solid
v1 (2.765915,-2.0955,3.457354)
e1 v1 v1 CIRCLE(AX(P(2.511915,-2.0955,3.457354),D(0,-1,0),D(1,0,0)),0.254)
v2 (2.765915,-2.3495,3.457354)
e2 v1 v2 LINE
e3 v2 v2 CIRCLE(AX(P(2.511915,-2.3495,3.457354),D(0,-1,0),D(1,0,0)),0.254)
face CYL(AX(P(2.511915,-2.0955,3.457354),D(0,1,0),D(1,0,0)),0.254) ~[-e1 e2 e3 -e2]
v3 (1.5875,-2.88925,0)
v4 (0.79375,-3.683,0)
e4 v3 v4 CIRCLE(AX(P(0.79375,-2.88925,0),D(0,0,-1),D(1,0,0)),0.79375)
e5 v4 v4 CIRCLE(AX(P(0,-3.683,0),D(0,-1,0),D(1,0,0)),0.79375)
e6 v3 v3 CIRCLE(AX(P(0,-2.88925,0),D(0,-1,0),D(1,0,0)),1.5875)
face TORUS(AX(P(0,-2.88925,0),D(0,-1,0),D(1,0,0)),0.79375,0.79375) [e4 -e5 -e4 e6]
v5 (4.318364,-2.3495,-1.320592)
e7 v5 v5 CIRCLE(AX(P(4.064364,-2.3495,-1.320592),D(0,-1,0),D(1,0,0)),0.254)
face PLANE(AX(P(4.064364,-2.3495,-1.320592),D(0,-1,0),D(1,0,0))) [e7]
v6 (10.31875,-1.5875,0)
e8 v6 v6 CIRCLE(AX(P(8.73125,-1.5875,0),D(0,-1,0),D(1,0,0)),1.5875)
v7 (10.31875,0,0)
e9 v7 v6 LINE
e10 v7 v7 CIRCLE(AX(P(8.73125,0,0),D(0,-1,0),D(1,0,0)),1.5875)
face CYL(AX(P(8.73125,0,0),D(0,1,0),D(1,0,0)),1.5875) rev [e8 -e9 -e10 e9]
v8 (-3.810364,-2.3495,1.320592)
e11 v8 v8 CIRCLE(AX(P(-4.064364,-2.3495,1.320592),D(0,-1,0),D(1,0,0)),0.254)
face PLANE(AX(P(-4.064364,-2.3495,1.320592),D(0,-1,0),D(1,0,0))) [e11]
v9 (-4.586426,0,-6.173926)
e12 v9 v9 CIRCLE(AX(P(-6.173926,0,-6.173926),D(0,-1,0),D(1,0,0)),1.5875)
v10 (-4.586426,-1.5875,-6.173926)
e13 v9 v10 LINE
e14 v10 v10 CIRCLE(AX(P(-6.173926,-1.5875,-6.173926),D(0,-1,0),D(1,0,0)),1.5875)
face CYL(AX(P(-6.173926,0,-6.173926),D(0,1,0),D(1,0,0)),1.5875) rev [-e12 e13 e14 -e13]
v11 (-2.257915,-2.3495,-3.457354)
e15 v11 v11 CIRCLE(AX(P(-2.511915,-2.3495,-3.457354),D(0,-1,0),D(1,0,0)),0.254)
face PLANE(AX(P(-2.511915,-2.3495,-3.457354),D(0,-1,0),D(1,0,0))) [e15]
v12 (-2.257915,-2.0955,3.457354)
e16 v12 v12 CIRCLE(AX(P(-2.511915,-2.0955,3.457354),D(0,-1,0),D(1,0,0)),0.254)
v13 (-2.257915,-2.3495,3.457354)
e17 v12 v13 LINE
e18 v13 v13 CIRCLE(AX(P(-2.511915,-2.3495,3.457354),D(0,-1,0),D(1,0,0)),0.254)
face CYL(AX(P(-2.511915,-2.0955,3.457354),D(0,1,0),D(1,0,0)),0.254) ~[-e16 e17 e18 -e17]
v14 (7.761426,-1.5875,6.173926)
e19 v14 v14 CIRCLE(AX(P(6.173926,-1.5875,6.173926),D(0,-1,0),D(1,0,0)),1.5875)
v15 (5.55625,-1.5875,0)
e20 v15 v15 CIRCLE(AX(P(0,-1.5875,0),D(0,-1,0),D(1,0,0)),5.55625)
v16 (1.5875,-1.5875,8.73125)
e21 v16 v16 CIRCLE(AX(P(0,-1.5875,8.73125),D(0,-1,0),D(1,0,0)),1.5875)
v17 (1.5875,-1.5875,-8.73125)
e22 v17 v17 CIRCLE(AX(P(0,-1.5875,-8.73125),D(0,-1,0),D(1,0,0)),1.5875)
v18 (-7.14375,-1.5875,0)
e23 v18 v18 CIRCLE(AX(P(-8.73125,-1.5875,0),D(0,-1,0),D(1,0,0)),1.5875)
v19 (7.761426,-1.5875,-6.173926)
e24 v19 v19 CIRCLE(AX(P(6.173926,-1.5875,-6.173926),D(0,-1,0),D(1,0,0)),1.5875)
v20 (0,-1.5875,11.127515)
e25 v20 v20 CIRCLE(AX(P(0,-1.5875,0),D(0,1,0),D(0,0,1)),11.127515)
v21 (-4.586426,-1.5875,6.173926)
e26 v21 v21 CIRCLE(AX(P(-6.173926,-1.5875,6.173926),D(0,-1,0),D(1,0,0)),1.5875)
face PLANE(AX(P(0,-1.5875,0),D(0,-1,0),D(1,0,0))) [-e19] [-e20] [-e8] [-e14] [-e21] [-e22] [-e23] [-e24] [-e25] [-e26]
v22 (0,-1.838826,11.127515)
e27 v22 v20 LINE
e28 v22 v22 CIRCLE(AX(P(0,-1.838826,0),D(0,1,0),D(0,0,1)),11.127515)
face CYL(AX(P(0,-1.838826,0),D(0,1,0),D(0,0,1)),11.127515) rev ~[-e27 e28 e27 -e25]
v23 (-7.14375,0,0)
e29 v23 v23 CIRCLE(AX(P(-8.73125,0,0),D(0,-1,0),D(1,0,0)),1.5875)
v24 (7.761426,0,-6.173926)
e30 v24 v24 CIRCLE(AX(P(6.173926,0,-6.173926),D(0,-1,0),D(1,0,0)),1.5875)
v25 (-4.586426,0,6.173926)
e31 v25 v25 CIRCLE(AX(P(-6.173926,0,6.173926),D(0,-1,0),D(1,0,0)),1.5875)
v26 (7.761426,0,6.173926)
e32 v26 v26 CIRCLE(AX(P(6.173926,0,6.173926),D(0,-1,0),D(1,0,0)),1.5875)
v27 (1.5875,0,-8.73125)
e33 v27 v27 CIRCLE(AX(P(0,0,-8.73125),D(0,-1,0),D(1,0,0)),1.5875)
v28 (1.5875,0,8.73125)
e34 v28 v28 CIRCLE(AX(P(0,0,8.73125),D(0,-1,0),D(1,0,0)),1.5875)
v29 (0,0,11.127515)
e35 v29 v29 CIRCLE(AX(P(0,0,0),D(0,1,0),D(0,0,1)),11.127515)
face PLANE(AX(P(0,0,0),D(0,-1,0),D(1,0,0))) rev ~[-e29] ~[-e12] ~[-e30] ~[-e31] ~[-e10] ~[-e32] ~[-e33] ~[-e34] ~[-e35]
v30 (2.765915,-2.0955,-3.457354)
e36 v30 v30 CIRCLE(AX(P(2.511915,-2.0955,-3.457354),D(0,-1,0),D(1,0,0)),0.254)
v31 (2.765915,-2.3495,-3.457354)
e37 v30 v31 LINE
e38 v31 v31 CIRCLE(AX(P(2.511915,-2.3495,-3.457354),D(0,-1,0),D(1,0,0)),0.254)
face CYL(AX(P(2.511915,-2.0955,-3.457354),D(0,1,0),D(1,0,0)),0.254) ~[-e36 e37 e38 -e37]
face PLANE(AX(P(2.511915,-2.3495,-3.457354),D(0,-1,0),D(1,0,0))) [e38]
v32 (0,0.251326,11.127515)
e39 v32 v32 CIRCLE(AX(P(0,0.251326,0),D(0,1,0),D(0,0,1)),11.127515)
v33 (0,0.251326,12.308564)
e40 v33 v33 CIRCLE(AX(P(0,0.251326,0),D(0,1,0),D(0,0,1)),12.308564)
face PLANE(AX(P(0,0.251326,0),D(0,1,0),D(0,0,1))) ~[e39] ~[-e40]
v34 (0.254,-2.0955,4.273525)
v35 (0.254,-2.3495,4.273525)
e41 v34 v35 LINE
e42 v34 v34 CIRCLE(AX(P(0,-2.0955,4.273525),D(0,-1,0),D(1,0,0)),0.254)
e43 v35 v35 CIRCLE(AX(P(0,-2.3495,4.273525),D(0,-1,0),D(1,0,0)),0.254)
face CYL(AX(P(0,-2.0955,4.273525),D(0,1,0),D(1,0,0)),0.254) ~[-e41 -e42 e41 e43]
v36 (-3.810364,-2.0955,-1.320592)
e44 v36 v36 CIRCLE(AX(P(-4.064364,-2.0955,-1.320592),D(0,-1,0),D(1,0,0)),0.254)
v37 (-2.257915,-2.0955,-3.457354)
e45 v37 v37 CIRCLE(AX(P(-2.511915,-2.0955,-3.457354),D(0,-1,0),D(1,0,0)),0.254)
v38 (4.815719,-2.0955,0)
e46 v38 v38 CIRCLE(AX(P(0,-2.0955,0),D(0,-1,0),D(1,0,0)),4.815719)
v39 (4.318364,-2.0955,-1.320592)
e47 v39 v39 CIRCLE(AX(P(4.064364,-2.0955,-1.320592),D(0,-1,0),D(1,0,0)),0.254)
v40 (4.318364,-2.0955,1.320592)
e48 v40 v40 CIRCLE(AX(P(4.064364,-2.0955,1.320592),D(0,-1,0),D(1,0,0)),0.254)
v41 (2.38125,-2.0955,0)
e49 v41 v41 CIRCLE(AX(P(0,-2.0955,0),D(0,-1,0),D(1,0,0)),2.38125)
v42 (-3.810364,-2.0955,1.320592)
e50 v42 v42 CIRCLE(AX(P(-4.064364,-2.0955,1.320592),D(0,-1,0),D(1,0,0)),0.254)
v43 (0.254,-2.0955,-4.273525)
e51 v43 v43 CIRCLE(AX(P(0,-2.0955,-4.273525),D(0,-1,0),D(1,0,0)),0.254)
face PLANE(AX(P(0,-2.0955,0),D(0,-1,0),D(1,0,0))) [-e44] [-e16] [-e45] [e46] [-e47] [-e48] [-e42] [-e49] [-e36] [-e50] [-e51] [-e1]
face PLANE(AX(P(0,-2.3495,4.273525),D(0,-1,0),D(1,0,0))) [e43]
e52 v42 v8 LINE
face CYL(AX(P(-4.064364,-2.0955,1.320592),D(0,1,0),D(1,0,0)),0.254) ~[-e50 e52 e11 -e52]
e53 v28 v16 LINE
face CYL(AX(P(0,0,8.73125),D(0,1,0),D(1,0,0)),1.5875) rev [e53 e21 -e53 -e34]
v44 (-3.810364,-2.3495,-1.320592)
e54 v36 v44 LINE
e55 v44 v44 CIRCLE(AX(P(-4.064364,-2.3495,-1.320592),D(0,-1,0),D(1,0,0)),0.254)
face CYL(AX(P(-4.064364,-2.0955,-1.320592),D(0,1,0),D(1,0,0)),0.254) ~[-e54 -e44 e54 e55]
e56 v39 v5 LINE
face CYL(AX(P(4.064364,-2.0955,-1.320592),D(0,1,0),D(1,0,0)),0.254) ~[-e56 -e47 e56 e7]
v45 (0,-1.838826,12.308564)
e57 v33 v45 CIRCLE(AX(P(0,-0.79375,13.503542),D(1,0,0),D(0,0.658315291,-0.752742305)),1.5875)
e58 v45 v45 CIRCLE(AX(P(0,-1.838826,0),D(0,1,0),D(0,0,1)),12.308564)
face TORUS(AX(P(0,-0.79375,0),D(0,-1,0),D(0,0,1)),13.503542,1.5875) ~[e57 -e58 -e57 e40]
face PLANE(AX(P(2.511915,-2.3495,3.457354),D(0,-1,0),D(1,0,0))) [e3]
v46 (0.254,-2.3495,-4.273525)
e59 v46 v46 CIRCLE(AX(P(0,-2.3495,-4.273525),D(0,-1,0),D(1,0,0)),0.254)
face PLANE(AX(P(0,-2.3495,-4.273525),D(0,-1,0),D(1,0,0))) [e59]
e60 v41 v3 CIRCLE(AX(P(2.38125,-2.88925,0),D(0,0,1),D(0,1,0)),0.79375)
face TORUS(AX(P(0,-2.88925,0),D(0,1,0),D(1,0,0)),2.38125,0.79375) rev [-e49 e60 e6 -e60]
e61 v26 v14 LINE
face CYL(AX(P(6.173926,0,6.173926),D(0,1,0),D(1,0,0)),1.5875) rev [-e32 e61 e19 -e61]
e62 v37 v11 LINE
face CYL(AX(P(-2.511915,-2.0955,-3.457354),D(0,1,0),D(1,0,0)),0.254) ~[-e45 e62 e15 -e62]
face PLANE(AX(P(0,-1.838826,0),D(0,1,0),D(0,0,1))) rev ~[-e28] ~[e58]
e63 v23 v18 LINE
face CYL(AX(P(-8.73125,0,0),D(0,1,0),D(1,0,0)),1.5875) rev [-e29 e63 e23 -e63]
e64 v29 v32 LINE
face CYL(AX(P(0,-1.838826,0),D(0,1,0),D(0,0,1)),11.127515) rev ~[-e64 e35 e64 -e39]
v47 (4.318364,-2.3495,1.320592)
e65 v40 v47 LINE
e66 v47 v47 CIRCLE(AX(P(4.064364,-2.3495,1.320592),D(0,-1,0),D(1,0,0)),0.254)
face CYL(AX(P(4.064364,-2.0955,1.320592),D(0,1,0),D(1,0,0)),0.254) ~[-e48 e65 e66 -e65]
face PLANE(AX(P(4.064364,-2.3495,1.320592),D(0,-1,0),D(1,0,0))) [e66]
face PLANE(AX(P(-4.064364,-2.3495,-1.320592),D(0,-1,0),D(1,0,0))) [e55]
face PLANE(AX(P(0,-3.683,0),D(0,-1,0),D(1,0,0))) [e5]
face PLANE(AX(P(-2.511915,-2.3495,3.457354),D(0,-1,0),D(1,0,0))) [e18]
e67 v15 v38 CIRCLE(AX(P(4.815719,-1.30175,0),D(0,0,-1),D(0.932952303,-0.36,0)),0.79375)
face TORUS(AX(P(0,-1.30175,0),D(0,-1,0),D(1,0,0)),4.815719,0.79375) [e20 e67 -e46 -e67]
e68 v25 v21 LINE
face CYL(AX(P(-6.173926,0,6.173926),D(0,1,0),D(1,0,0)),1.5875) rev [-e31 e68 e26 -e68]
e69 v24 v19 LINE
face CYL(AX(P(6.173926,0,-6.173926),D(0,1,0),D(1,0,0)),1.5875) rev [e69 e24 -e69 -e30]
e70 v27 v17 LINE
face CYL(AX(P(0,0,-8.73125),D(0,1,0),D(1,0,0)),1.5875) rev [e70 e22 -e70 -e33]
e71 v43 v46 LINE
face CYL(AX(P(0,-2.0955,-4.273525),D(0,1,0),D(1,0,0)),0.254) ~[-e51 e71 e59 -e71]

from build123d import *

# Parameters (mm, degrees)
F0_R     = 11.90625
F0_R_2   = 1.5875
F0_R_3   = 5.55625
F1_DEPTH = 1.5875
F2_R     = 5.55625
F3_DEPTH = 0.508
F4_R     = 0.254
F5_DEPTH = 0.254
F6_R     = 1.5875
F7_DEPTH = 1.5875


# Not quite as in the source:
# - a fillet or chamfer that OpenCascade refuses, or shapes differently, is made with other operations: its cross-section is extruded or revolved along the edge and cut away or added


with BuildPart() as f1:
    # F0 (on Front) → F1 (new body)
    with BuildSketch(Plane.XZ):
        Circle(F0_R)
        with Locations((-6.1739260832, -6.1739260832)):
            Circle(F0_R_2, mode=Mode.SUBTRACT)
        with Locations((0, -8.73125)):
            Circle(F0_R_2, mode=Mode.SUBTRACT)
        with Locations((6.1739260832, -6.1739260832)):
            Circle(F0_R_2, mode=Mode.SUBTRACT)
        with Locations((-8.73125, 0)):
            Circle(F0_R_2, mode=Mode.SUBTRACT)
        with Locations((-6.1739260832, 6.1739260832)):
            Circle(F0_R_2, mode=Mode.SUBTRACT)
        Circle(F0_R_3, mode=Mode.SUBTRACT)
        with Locations((8.73125, 0)):
            Circle(F0_R_2, mode=Mode.SUBTRACT)
        with Locations((0, 8.73125)):
            Circle(F0_R_2, mode=Mode.SUBTRACT)
        with Locations((6.1739260832, 6.1739260832)):
            Circle(F0_R_2, mode=Mode.SUBTRACT)
        Circle(F0_R_3)
    extrude(amount=F1_DEPTH)

    # F2 (on face) → F3 (join)
    with BuildSketch(Plane.XZ.offset(1.5875)):
        Circle(F2_R)
    extrude(amount=F3_DEPTH)

    # F4 (on face) → F5 (join)
    with BuildSketch(Plane.XZ.offset(2.0955)):
        with Locations((-2.5119149548, 3.4573543295)):
            Circle(F4_R)
        with Locations((0, 4.2735249735)):
            Circle(F4_R)
        with Locations((2.5119149548, 3.4573543295)):
            Circle(F4_R)
        with Locations((4.0643637736, 1.3205918427)):
            Circle(F4_R)
        with Locations((4.0643637736, -1.3205918427)):
            Circle(F4_R)
        with Locations((2.5119149548, -3.4573543295)):
            Circle(F4_R)
        with Locations((0, -4.2735249735)):
            Circle(F4_R)
        with Locations((-2.5119149548, -3.4573543295)):
            Circle(F4_R)
        with Locations((-4.0643637736, -1.3205918427)):
            Circle(F4_R)
        with Locations((-4.0643637736, 1.3205918427)):
            Circle(F4_R)
    extrude(amount=F5_DEPTH)

    # F6 (on face) → F7 (join)
    with BuildSketch(Plane.XZ.offset(2.0955)):
        Circle(F6_R)
    extrude(amount=F7_DEPTH)

    # F8: fillet of radius 0.79375 on 3 edges, made by hand

    # F8_s1 → F8_t2 (revolve)
    with BuildSketch(Plane.XY):
        with BuildLine():
            ThreePointArc((2.38125, -2.0955), (1.8199839924, -2.3279839924), (1.5875, -2.88925))
            Line((1.5875, -2.88925), (1.5875, -2.0955))
            Line((1.5875, -2.0955), (2.38125, -2.0955))
        make_face()
    revolve(axis=Axis((0, -2.0955, 0), (0, -1, 0)))

    # F8_s3 → F8_t4 (revolve, cut)
    with BuildSketch(Plane.XY):
        with BuildLine():
            ThreePointArc((5.55625, -1.5875), (5.2647319154, -1.9562930181), (4.8157191094, -2.0955))
            Line((4.8157191094, -2.0955), (5.55625, -2.0955))
            Line((5.55625, -2.0955), (5.55625, -1.5875))
        make_face()
    revolve(axis=Axis((0, -2.0955, 0), (0, -1, 0)), mode=Mode.SUBTRACT)

    # F8_s5 → F8_t6 (revolve, cut)
    with BuildSketch(Plane.XY):
        with BuildLine():
            ThreePointArc((1.5875, -2.88925), (1.3550160076, -3.4505160076), (0.79375, -3.683))
            Line((0.79375, -3.683), (1.5875, -3.683))
            Line((1.5875, -3.683), (1.5875, -2.88925))
        make_face()
    revolve(axis=Axis((0, -3.683, 0), (0, -1, 0)), mode=Mode.SUBTRACT)

    # F9 (on Right) → F10 (revolve)
    with BuildSketch(Plane.YZ):
        with BuildLine():
            Line((0.2513255238, 11.1275145485), (0.2513255238, 12.3085637603))
            ThreePointArc((0.2513255238, 12.3085637603), (-0.79375, 15.0910421699), (-1.8388255238, 12.3085637603))
            Line((-1.8388255238, 12.3085637603), (-1.8388255238, 11.1275145485))
            Line((-1.8388255238, 11.1275145485), (0.2513255238, 11.1275145485))
        make_face()
    revolve(axis=Axis((0, -1.3428883394, 0), (0, 1, 0)))


solid = f1.part
